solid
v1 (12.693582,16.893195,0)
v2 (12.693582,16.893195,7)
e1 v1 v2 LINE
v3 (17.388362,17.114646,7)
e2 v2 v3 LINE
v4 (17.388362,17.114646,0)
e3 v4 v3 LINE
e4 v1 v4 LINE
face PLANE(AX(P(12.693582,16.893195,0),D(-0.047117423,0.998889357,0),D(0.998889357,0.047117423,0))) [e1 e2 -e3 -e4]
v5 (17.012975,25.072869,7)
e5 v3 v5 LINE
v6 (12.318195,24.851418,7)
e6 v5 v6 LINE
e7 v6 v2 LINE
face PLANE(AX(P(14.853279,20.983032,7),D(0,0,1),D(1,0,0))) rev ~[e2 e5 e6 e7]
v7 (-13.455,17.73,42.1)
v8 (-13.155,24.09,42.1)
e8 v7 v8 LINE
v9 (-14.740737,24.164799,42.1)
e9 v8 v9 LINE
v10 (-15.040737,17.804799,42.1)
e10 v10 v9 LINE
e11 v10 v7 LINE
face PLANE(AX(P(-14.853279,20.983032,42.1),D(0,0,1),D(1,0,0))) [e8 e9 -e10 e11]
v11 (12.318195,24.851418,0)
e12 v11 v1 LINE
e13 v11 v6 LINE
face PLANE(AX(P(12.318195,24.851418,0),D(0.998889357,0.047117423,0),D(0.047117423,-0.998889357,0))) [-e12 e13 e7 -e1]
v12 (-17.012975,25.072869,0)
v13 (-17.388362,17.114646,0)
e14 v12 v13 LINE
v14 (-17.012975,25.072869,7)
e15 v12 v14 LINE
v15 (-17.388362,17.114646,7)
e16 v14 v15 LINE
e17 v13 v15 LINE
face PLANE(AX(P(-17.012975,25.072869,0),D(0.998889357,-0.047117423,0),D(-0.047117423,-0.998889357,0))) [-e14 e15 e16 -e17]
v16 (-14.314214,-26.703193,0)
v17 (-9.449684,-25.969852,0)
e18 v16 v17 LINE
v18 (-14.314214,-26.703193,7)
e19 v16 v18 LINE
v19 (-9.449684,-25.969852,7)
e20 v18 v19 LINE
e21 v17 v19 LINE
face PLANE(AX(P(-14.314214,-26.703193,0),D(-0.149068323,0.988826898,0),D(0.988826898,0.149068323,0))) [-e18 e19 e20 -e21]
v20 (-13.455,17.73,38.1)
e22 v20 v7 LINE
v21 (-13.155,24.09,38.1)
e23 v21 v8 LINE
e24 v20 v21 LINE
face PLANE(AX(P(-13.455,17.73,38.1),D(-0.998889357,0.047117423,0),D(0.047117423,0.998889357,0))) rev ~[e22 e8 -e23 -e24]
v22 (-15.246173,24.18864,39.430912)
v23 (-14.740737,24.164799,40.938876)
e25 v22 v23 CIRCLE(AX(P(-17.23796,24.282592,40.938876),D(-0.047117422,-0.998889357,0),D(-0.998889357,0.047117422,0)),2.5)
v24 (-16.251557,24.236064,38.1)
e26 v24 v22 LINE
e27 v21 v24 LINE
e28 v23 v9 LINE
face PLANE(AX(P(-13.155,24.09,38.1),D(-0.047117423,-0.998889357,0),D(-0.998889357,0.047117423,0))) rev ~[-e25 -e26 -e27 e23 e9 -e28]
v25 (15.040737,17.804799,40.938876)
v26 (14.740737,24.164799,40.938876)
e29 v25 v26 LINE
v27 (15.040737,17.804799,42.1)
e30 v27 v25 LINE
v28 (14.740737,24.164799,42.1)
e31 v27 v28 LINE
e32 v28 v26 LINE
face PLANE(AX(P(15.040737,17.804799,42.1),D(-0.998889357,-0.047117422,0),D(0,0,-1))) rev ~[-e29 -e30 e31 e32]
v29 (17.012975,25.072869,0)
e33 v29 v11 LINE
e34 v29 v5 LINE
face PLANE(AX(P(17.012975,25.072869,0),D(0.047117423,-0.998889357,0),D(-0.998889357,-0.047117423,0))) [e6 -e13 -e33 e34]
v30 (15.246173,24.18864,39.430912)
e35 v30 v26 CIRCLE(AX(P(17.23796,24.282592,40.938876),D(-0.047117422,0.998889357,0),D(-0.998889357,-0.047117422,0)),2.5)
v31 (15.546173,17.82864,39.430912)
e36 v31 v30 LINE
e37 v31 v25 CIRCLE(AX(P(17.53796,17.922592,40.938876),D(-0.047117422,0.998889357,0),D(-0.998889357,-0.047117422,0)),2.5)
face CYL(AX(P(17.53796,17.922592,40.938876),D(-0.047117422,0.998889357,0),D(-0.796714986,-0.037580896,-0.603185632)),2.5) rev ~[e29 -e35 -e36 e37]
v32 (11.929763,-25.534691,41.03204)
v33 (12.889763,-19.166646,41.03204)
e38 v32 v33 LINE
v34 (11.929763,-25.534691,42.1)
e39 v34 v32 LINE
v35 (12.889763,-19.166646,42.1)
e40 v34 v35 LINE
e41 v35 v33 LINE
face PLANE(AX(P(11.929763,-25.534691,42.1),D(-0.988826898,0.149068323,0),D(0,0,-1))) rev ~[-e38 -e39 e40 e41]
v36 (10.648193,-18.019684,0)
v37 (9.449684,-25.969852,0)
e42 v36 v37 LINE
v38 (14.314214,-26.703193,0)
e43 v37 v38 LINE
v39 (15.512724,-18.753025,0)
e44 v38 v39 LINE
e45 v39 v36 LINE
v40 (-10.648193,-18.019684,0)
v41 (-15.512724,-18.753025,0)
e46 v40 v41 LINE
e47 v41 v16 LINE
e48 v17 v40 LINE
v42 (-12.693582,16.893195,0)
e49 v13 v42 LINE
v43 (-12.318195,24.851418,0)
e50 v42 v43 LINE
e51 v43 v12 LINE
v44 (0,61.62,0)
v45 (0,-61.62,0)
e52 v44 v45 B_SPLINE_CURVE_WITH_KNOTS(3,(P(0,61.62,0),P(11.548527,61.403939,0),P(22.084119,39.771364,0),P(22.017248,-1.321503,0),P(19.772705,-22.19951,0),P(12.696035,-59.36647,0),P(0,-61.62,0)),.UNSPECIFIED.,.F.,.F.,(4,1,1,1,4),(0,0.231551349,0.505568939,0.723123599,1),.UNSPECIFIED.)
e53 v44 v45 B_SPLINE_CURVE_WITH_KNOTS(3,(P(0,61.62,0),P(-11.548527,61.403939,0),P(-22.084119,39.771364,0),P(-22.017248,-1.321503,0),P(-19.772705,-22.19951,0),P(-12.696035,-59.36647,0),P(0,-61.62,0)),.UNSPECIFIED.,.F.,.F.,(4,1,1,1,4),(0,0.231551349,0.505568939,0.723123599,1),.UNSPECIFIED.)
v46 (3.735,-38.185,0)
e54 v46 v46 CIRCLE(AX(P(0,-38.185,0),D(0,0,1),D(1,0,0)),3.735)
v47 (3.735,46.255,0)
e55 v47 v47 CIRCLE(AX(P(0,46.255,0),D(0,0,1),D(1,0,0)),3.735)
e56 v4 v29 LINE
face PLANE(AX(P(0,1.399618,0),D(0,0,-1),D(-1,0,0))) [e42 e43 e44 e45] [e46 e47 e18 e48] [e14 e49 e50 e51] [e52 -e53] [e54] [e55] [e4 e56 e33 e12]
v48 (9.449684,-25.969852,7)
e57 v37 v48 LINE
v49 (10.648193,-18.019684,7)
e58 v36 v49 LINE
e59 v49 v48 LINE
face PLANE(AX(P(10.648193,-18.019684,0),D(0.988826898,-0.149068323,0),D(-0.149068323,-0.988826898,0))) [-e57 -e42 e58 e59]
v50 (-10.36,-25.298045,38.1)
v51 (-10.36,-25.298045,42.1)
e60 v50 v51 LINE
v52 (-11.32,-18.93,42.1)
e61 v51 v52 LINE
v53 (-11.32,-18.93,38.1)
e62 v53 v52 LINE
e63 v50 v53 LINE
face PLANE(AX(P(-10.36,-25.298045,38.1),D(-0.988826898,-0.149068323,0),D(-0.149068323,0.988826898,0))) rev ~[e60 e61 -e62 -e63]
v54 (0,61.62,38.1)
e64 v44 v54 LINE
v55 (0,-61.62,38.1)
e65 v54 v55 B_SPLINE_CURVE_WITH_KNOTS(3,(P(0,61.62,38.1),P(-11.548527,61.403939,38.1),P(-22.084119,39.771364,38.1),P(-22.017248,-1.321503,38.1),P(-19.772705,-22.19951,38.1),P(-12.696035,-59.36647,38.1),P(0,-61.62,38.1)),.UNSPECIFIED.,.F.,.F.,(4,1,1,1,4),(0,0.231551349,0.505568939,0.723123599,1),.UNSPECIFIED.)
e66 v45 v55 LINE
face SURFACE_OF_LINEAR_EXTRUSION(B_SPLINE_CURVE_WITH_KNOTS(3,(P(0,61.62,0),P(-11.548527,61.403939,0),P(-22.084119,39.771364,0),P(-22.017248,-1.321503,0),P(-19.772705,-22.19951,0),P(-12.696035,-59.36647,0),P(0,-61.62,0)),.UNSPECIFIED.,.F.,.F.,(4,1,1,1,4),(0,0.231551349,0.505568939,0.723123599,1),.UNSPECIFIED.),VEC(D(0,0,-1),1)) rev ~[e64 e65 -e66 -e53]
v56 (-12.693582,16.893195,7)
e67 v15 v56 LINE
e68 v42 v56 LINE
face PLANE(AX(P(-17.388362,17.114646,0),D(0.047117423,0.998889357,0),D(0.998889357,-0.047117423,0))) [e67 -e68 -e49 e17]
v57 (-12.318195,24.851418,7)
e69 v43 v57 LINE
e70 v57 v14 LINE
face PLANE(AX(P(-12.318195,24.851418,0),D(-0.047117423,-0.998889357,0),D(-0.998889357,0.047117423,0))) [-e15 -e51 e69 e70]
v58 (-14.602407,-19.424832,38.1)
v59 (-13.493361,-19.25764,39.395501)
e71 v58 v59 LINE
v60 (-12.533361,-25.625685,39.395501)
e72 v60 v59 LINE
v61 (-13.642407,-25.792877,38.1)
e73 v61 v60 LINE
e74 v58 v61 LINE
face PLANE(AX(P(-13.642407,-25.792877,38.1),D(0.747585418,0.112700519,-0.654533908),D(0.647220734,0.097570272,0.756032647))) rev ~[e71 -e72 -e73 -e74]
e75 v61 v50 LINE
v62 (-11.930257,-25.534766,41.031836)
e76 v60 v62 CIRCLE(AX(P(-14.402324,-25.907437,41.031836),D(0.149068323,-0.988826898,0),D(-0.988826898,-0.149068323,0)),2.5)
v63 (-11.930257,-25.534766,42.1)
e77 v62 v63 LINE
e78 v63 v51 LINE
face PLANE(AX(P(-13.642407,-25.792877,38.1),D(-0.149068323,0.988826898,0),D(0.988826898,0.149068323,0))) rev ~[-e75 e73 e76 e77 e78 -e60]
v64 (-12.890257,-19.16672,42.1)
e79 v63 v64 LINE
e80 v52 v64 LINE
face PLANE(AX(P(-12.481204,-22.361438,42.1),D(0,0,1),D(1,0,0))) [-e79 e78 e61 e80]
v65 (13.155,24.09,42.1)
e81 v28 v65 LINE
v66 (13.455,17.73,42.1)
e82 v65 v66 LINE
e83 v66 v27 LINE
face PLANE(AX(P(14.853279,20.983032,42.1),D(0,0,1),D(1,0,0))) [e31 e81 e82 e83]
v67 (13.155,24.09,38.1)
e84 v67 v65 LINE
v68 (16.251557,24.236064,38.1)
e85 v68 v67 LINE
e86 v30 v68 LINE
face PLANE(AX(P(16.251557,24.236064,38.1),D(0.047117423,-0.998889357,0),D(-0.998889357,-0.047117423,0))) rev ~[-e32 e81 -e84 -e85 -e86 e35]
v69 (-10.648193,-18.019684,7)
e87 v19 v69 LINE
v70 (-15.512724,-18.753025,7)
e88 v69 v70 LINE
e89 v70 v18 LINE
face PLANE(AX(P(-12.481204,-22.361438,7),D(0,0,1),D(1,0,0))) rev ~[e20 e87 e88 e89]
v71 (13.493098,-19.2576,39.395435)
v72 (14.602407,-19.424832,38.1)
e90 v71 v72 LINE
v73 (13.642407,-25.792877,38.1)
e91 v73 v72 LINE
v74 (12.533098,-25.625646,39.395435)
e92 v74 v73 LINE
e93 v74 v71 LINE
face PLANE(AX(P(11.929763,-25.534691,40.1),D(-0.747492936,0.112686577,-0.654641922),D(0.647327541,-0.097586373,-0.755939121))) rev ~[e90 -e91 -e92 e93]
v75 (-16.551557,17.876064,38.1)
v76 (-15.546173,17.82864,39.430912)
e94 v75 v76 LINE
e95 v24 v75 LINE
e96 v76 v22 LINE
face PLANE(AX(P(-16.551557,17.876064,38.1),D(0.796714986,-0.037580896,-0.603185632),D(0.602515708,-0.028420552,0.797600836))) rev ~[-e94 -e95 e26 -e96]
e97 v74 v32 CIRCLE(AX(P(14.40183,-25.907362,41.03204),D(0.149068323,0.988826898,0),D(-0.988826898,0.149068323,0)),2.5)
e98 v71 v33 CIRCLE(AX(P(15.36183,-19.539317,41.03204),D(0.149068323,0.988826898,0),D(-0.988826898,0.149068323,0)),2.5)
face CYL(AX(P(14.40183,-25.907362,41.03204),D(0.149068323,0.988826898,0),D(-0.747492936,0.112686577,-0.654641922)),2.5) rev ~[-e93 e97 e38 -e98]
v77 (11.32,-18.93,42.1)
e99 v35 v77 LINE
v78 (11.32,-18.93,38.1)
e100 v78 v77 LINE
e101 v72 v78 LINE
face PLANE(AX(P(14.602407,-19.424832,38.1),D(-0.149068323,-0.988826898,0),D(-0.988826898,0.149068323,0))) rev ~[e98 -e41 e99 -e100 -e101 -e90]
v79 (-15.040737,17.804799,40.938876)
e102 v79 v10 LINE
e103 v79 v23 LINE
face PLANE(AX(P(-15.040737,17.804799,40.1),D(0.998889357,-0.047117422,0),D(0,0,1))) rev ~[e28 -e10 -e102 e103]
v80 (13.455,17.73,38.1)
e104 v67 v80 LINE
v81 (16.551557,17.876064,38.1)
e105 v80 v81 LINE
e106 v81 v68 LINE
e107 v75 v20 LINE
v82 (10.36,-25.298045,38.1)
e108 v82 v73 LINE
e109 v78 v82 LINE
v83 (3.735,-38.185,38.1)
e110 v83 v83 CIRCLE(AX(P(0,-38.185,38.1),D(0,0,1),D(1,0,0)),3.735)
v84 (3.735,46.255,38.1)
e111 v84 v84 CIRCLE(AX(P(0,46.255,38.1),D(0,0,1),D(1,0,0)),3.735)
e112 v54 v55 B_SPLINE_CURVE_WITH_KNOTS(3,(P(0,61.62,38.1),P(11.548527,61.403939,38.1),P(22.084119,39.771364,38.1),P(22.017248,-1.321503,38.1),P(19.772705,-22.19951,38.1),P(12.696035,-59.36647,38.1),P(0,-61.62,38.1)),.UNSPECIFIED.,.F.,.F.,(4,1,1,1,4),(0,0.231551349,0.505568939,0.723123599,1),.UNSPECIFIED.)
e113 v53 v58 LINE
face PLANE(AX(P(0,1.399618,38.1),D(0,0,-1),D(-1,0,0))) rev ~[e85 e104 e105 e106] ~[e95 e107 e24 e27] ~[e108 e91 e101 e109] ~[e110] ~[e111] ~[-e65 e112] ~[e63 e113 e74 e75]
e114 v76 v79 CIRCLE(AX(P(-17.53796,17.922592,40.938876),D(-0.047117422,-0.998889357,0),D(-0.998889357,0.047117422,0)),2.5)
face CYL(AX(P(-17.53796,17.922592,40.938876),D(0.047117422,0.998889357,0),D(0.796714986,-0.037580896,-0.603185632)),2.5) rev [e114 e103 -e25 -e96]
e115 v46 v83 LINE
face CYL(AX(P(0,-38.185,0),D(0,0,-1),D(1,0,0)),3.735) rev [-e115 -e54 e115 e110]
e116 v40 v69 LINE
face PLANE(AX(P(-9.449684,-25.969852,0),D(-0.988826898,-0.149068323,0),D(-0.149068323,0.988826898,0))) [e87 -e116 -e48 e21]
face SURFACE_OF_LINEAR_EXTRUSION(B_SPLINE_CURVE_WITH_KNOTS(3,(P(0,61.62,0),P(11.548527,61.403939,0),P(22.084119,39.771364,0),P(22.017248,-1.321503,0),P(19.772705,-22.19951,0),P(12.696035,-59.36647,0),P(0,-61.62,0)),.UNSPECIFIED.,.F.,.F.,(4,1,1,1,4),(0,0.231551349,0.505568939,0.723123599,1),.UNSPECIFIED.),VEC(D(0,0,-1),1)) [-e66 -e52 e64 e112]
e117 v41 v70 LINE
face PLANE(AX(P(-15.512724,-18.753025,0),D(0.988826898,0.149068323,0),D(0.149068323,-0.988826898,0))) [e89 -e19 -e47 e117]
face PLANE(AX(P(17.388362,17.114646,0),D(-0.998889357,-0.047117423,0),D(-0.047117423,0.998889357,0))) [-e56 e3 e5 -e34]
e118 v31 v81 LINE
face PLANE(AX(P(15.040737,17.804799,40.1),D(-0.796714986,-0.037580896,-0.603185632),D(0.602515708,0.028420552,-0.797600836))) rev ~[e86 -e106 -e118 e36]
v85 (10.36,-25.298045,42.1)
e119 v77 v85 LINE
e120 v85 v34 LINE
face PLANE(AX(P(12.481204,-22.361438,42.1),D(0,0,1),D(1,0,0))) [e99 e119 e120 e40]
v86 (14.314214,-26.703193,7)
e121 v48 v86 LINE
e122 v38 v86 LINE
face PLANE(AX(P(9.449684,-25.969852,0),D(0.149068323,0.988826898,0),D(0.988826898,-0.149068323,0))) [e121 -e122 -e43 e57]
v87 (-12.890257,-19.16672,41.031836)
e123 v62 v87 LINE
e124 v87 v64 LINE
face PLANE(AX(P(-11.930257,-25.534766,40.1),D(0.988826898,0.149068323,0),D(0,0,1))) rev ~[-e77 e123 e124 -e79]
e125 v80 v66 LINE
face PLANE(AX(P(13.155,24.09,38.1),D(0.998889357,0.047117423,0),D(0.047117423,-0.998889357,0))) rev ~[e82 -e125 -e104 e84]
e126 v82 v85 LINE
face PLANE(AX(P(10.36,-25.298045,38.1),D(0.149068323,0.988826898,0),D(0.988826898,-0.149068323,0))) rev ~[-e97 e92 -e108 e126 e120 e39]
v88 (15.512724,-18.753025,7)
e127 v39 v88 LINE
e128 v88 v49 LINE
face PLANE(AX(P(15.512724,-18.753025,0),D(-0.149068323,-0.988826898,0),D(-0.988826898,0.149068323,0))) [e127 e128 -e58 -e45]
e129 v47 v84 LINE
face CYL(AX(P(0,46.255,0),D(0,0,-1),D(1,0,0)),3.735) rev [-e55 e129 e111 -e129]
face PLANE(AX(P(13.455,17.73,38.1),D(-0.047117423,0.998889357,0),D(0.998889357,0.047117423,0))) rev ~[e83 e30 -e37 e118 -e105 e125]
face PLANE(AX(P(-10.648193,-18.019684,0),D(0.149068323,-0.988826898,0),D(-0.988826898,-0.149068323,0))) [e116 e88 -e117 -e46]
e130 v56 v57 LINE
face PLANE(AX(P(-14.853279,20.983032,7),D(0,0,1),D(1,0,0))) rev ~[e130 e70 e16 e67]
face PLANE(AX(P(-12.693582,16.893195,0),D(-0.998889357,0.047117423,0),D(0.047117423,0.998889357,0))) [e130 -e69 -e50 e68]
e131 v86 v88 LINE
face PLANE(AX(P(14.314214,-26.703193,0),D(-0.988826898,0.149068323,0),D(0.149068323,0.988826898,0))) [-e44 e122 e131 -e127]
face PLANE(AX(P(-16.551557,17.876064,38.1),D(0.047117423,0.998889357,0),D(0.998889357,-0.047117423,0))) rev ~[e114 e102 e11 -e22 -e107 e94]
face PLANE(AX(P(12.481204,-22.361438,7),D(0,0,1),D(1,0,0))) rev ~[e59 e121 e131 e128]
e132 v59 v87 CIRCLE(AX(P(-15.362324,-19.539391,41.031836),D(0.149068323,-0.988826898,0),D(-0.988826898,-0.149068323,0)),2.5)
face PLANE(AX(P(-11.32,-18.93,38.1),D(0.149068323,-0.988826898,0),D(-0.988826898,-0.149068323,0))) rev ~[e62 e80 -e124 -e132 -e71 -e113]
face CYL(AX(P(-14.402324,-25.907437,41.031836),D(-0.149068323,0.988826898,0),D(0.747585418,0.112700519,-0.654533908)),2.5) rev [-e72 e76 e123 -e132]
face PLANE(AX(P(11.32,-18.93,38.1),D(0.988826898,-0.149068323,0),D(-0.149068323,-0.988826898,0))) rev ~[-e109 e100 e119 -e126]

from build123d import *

# Parameters (mm, degrees)
F1_R      = 3.735
F2_DEPTH  = 38.1
F4_DEPTH  = 4
F6_DEPTH  = 6.44
F8_DEPTH  = 6.3670715404
F10_DEPTH = 6.3670715404
F12_DEPTH = 6.44
F13_R     = 2.5
F14_DEPTH = 7


# Not quite as in the source:
# - a feature names something its author has since deleted; it is built from what else it names


with BuildPart() as f2:
    # F1 (on Top) → F2 (new body)
    with BuildSketch(Plane.XY):
        with BuildLine():
            add(Edge.make_bspline(
                [(0, 61.62), (11.5485272162, 61.4039385019), (22.0841192578, 39.7713639929), (22.0172478155, -1.3215032222), (19.7727052767, -22.1995102033), (12.6960353016, -59.3664700438), (0, -61.62)],
                knots=[0, 0, 0, 0, 0.2315513491, 0.5055689387, 0.7231235988, 1, 1, 1, 1], degree=3))
            add(Edge.make_bspline(
                [(0, 61.62), (-11.5485272162, 61.4039385019), (-22.0841192578, 39.7713639929), (-22.0172478155, -1.3215032222), (-19.7727052767, -22.1995102033), (-12.6960353016, -59.3664700438), (0, -61.62)],
                knots=[0, 0, 0, 0, 0.2315513491, 0.5055689387, 0.7231235988, 1, 1, 1, 1], degree=3))
        make_face()
        Polygon((-14.3142142012, -26.7031931663), (-15.512723518, -18.7530249028), (-10.6481931396, -18.0196838229), (-9.4496838229, -25.9698520863), align=None, mode=Mode.SUBTRACT)
        with Locations((0, -38.185)):
            Circle(F1_R, mode=Mode.SUBTRACT)
        Polygon((9.4496838229, -25.9698520863), (10.6481931396, -18.0196838229), (15.512723518, -18.7530249028), (14.3142142012, -26.7031931663), align=None, mode=Mode.SUBTRACT)
        Polygon((-17.3883624322, 17.1146464619), (-17.0129745562, 25.0728694338), (-12.318194576, 24.851417548), (-12.693582452, 16.893194576), align=None, mode=Mode.SUBTRACT)
        Polygon((17.3883624322, 17.1146464619), (12.693582452, 16.893194576), (12.318194576, 24.851417548), (17.0129745562, 25.0728694338), align=None, mode=Mode.SUBTRACT)
        with Locations((0, 46.255)):
            Circle(F1_R, mode=Mode.SUBTRACT)
        Polygon((15.512723518, -18.7530249028), (10.6481931396, -18.0196838229), (9.4496838229, -25.9698520863), (14.3142142012, -26.7031931663), align=None)
        Polygon((10.36, -25.298045226), (11.32, -18.93), (14.6024073408, -19.4248317632), (13.6424073408, -25.7928769892), align=None, mode=Mode.SUBTRACT)
        Polygon((-10.6481931396, -18.0196838229), (-15.512723518, -18.7530249028), (-14.3142142012, -26.7031931663), (-9.4496838229, -25.9698520863), align=None)
        Polygon((-14.6024073408, -19.4248317632), (-11.32, -18.93), (-10.36, -25.298045226), (-13.6424073408, -25.7928769892), align=None, mode=Mode.SUBTRACT)
        Polygon((-12.318194576, 24.851417548), (-17.0129745562, 25.0728694338), (-17.3883624322, 17.1146464619), (-12.693582452, 16.893194576), align=None)
        Polygon((-13.155, 24.09), (-13.455, 17.73), (-16.5515570082, 17.8760640098), (-16.2515570082, 24.2360640098), align=None, mode=Mode.SUBTRACT)
        Polygon((12.318194576, 24.851417548), (12.693582452, 16.893194576), (17.3883624322, 17.1146464619), (17.0129745562, 25.0728694338), align=None)
        Polygon((16.5515570082, 17.8760640098), (13.455, 17.73), (13.155, 24.09), (16.2515570082, 24.2360640098), align=None, mode=Mode.SUBTRACT)
        Polygon((14.6024073408, -19.4248317632), (11.32, -18.93), (10.36, -25.298045226), (13.6424073408, -25.7928769892), align=None)
        Polygon((-10.36, -25.298045226), (-11.32, -18.93), (-14.6024073408, -19.4248317632), (-13.6424073408, -25.7928769892), align=None)
        Polygon((-16.5515570082, 17.8760640098), (-13.455, 17.73), (-13.155, 24.09), (-16.2515570082, 24.2360640098), align=None)
        Polygon((13.155, 24.09), (13.455, 17.73), (16.5515570082, 17.8760640098), (16.2515570082, 24.2360640098), align=None)
    extrude(amount=F2_DEPTH)

    # F3 (on face) → F4 (join)
    with BuildSketch(Plane.XY.offset(38.1)):
        Polygon((-10.36, -25.298045226), (-11.32, -18.93), (-14.6024073408, -19.4248317632), (-13.6424073408, -25.7928769892), align=None)
        Polygon((14.6024073408, -19.4248317632), (11.32, -18.93), (10.36, -25.298045226), (13.6424073408, -25.7928769892), align=None)
        Polygon((13.155, 24.09), (13.455, 17.73), (16.5515570082, 17.8760640098), (16.2515570082, 24.2360640098), align=None)
        Polygon((-16.5515570082, 17.8760640098), (-13.455, 17.73), (-13.155, 24.09), (-16.2515570082, 24.2360640098), align=None)
    extrude(amount=F4_DEPTH)

    # F5 (on face) → F6 (cut, through all)
    with BuildSketch(Plane(origin=(3.4987885373, -23.2087954603, 0), x_dir=(0.9888268984, 0.149068323, 0), z_dir=(0.149068323, -0.9888268984, 0))):
        Polygon((-17.3348802558, 42.1), (-17.3348802558, 38.1), (-15.6033838444, 40.1), (-15.6033838444, 42.1), align=None)
    extrude(amount=-F6_DEPTH, mode=Mode.SUBTRACT)

    # F7 (on face) → F8 (cut, through all)
    with BuildSketch(Plane(origin=(0.8045932866, 17.0573776752, 0), x_dir=(0.9988893575, -0.0471174225, 0), z_dir=(-0.0471174225, -0.9988893575, 0))):
        Polygon((-15.8629482063, 40.1), (-15.8629482063, 42.1), (-17.3754482063, 42.1), (-17.3754482063, 38.1), align=None)
    extrude(amount=-F8_DEPTH, mode=Mode.SUBTRACT)

    # F9 (on face) → F10 (cut, through all)
    with BuildSketch(Plane(origin=(-0.8045932866, 17.0573776752, 0), x_dir=(0.9988893575, 0.0471174225, 0), z_dir=(0.0471174225, -0.9988893575, 0))):
        Polygon((15.8629482063, 42.1), (15.8629482063, 40.1), (17.3754482063, 38.1), (17.3754482063, 42.1), align=None)
    extrude(amount=-F10_DEPTH, mode=Mode.SUBTRACT)

    # F11 (on face) → F12 (cut, through all)
    with BuildSketch(Plane(origin=(-3.4987885373, -23.2087954603, 0), x_dir=(0.9888268984, -0.149068323, 0), z_dir=(-0.149068323, -0.9888268984, 0))):
        Polygon((17.3348802558, 42.1), (15.6028838444, 42.1), (15.6028838444, 40.1), (17.3348802558, 38.1), align=None)
    extrude(amount=-F12_DEPTH, mode=Mode.SUBTRACT)

    # F13
    f13_edges = [f2.edges().sort_by_distance(p)[0] for p in [
        (12.409763, -22.350669, 40.1),
        (14.890737, 20.984799, 40.1),
        (-14.890737, 20.984799, 40.1),
        (-12.410257, -22.350743, 40.1),
    ]]
    fillet(f13_edges, radius=F13_R)

    # F1 (on Top) → F14 (cut)
    with BuildSketch(Plane.XY):
        Polygon((15.512723518, -18.7530249028), (10.6481931396, -18.0196838229), (9.4496838229, -25.9698520863), (14.3142142012, -26.7031931663), align=None)
        Polygon((10.36, -25.298045226), (11.32, -18.93), (14.6024073408, -19.4248317632), (13.6424073408, -25.7928769892), align=None, mode=Mode.SUBTRACT)
        Polygon((-10.6481931396, -18.0196838229), (-15.512723518, -18.7530249028), (-14.3142142012, -26.7031931663), (-9.4496838229, -25.9698520863), align=None)
        Polygon((-14.6024073408, -19.4248317632), (-11.32, -18.93), (-10.36, -25.298045226), (-13.6424073408, -25.7928769892), align=None, mode=Mode.SUBTRACT)
        Polygon((12.318194576, 24.851417548), (12.693582452, 16.893194576), (17.3883624322, 17.1146464619), (17.0129745562, 25.0728694338), align=None)
        Polygon((16.5515570082, 17.8760640098), (13.455, 17.73), (13.155, 24.09), (16.2515570082, 24.2360640098), align=None, mode=Mode.SUBTRACT)
        Polygon((-12.318194576, 24.851417548), (-17.0129745562, 25.0728694338), (-17.3883624322, 17.1146464619), (-12.693582452, 16.893194576), align=None)
        Polygon((-13.155, 24.09), (-13.455, 17.73), (-16.5515570082, 17.8760640098), (-16.2515570082, 24.2360640098), align=None, mode=Mode.SUBTRACT)
        Polygon((-10.36, -25.298045226), (-11.32, -18.93), (-14.6024073408, -19.4248317632), (-13.6424073408, -25.7928769892), align=None)
        Polygon((14.6024073408, -19.4248317632), (11.32, -18.93), (10.36, -25.298045226), (13.6424073408, -25.7928769892), align=None)
        Polygon((13.155, 24.09), (13.455, 17.73), (16.5515570082, 17.8760640098), (16.2515570082, 24.2360640098), align=None)
        Polygon((-16.5515570082, 17.8760640098), (-13.455, 17.73), (-13.155, 24.09), (-16.2515570082, 24.2360640098), align=None)
    extrude(amount=F14_DEPTH, mode=Mode.SUBTRACT)


solid = f2.part
